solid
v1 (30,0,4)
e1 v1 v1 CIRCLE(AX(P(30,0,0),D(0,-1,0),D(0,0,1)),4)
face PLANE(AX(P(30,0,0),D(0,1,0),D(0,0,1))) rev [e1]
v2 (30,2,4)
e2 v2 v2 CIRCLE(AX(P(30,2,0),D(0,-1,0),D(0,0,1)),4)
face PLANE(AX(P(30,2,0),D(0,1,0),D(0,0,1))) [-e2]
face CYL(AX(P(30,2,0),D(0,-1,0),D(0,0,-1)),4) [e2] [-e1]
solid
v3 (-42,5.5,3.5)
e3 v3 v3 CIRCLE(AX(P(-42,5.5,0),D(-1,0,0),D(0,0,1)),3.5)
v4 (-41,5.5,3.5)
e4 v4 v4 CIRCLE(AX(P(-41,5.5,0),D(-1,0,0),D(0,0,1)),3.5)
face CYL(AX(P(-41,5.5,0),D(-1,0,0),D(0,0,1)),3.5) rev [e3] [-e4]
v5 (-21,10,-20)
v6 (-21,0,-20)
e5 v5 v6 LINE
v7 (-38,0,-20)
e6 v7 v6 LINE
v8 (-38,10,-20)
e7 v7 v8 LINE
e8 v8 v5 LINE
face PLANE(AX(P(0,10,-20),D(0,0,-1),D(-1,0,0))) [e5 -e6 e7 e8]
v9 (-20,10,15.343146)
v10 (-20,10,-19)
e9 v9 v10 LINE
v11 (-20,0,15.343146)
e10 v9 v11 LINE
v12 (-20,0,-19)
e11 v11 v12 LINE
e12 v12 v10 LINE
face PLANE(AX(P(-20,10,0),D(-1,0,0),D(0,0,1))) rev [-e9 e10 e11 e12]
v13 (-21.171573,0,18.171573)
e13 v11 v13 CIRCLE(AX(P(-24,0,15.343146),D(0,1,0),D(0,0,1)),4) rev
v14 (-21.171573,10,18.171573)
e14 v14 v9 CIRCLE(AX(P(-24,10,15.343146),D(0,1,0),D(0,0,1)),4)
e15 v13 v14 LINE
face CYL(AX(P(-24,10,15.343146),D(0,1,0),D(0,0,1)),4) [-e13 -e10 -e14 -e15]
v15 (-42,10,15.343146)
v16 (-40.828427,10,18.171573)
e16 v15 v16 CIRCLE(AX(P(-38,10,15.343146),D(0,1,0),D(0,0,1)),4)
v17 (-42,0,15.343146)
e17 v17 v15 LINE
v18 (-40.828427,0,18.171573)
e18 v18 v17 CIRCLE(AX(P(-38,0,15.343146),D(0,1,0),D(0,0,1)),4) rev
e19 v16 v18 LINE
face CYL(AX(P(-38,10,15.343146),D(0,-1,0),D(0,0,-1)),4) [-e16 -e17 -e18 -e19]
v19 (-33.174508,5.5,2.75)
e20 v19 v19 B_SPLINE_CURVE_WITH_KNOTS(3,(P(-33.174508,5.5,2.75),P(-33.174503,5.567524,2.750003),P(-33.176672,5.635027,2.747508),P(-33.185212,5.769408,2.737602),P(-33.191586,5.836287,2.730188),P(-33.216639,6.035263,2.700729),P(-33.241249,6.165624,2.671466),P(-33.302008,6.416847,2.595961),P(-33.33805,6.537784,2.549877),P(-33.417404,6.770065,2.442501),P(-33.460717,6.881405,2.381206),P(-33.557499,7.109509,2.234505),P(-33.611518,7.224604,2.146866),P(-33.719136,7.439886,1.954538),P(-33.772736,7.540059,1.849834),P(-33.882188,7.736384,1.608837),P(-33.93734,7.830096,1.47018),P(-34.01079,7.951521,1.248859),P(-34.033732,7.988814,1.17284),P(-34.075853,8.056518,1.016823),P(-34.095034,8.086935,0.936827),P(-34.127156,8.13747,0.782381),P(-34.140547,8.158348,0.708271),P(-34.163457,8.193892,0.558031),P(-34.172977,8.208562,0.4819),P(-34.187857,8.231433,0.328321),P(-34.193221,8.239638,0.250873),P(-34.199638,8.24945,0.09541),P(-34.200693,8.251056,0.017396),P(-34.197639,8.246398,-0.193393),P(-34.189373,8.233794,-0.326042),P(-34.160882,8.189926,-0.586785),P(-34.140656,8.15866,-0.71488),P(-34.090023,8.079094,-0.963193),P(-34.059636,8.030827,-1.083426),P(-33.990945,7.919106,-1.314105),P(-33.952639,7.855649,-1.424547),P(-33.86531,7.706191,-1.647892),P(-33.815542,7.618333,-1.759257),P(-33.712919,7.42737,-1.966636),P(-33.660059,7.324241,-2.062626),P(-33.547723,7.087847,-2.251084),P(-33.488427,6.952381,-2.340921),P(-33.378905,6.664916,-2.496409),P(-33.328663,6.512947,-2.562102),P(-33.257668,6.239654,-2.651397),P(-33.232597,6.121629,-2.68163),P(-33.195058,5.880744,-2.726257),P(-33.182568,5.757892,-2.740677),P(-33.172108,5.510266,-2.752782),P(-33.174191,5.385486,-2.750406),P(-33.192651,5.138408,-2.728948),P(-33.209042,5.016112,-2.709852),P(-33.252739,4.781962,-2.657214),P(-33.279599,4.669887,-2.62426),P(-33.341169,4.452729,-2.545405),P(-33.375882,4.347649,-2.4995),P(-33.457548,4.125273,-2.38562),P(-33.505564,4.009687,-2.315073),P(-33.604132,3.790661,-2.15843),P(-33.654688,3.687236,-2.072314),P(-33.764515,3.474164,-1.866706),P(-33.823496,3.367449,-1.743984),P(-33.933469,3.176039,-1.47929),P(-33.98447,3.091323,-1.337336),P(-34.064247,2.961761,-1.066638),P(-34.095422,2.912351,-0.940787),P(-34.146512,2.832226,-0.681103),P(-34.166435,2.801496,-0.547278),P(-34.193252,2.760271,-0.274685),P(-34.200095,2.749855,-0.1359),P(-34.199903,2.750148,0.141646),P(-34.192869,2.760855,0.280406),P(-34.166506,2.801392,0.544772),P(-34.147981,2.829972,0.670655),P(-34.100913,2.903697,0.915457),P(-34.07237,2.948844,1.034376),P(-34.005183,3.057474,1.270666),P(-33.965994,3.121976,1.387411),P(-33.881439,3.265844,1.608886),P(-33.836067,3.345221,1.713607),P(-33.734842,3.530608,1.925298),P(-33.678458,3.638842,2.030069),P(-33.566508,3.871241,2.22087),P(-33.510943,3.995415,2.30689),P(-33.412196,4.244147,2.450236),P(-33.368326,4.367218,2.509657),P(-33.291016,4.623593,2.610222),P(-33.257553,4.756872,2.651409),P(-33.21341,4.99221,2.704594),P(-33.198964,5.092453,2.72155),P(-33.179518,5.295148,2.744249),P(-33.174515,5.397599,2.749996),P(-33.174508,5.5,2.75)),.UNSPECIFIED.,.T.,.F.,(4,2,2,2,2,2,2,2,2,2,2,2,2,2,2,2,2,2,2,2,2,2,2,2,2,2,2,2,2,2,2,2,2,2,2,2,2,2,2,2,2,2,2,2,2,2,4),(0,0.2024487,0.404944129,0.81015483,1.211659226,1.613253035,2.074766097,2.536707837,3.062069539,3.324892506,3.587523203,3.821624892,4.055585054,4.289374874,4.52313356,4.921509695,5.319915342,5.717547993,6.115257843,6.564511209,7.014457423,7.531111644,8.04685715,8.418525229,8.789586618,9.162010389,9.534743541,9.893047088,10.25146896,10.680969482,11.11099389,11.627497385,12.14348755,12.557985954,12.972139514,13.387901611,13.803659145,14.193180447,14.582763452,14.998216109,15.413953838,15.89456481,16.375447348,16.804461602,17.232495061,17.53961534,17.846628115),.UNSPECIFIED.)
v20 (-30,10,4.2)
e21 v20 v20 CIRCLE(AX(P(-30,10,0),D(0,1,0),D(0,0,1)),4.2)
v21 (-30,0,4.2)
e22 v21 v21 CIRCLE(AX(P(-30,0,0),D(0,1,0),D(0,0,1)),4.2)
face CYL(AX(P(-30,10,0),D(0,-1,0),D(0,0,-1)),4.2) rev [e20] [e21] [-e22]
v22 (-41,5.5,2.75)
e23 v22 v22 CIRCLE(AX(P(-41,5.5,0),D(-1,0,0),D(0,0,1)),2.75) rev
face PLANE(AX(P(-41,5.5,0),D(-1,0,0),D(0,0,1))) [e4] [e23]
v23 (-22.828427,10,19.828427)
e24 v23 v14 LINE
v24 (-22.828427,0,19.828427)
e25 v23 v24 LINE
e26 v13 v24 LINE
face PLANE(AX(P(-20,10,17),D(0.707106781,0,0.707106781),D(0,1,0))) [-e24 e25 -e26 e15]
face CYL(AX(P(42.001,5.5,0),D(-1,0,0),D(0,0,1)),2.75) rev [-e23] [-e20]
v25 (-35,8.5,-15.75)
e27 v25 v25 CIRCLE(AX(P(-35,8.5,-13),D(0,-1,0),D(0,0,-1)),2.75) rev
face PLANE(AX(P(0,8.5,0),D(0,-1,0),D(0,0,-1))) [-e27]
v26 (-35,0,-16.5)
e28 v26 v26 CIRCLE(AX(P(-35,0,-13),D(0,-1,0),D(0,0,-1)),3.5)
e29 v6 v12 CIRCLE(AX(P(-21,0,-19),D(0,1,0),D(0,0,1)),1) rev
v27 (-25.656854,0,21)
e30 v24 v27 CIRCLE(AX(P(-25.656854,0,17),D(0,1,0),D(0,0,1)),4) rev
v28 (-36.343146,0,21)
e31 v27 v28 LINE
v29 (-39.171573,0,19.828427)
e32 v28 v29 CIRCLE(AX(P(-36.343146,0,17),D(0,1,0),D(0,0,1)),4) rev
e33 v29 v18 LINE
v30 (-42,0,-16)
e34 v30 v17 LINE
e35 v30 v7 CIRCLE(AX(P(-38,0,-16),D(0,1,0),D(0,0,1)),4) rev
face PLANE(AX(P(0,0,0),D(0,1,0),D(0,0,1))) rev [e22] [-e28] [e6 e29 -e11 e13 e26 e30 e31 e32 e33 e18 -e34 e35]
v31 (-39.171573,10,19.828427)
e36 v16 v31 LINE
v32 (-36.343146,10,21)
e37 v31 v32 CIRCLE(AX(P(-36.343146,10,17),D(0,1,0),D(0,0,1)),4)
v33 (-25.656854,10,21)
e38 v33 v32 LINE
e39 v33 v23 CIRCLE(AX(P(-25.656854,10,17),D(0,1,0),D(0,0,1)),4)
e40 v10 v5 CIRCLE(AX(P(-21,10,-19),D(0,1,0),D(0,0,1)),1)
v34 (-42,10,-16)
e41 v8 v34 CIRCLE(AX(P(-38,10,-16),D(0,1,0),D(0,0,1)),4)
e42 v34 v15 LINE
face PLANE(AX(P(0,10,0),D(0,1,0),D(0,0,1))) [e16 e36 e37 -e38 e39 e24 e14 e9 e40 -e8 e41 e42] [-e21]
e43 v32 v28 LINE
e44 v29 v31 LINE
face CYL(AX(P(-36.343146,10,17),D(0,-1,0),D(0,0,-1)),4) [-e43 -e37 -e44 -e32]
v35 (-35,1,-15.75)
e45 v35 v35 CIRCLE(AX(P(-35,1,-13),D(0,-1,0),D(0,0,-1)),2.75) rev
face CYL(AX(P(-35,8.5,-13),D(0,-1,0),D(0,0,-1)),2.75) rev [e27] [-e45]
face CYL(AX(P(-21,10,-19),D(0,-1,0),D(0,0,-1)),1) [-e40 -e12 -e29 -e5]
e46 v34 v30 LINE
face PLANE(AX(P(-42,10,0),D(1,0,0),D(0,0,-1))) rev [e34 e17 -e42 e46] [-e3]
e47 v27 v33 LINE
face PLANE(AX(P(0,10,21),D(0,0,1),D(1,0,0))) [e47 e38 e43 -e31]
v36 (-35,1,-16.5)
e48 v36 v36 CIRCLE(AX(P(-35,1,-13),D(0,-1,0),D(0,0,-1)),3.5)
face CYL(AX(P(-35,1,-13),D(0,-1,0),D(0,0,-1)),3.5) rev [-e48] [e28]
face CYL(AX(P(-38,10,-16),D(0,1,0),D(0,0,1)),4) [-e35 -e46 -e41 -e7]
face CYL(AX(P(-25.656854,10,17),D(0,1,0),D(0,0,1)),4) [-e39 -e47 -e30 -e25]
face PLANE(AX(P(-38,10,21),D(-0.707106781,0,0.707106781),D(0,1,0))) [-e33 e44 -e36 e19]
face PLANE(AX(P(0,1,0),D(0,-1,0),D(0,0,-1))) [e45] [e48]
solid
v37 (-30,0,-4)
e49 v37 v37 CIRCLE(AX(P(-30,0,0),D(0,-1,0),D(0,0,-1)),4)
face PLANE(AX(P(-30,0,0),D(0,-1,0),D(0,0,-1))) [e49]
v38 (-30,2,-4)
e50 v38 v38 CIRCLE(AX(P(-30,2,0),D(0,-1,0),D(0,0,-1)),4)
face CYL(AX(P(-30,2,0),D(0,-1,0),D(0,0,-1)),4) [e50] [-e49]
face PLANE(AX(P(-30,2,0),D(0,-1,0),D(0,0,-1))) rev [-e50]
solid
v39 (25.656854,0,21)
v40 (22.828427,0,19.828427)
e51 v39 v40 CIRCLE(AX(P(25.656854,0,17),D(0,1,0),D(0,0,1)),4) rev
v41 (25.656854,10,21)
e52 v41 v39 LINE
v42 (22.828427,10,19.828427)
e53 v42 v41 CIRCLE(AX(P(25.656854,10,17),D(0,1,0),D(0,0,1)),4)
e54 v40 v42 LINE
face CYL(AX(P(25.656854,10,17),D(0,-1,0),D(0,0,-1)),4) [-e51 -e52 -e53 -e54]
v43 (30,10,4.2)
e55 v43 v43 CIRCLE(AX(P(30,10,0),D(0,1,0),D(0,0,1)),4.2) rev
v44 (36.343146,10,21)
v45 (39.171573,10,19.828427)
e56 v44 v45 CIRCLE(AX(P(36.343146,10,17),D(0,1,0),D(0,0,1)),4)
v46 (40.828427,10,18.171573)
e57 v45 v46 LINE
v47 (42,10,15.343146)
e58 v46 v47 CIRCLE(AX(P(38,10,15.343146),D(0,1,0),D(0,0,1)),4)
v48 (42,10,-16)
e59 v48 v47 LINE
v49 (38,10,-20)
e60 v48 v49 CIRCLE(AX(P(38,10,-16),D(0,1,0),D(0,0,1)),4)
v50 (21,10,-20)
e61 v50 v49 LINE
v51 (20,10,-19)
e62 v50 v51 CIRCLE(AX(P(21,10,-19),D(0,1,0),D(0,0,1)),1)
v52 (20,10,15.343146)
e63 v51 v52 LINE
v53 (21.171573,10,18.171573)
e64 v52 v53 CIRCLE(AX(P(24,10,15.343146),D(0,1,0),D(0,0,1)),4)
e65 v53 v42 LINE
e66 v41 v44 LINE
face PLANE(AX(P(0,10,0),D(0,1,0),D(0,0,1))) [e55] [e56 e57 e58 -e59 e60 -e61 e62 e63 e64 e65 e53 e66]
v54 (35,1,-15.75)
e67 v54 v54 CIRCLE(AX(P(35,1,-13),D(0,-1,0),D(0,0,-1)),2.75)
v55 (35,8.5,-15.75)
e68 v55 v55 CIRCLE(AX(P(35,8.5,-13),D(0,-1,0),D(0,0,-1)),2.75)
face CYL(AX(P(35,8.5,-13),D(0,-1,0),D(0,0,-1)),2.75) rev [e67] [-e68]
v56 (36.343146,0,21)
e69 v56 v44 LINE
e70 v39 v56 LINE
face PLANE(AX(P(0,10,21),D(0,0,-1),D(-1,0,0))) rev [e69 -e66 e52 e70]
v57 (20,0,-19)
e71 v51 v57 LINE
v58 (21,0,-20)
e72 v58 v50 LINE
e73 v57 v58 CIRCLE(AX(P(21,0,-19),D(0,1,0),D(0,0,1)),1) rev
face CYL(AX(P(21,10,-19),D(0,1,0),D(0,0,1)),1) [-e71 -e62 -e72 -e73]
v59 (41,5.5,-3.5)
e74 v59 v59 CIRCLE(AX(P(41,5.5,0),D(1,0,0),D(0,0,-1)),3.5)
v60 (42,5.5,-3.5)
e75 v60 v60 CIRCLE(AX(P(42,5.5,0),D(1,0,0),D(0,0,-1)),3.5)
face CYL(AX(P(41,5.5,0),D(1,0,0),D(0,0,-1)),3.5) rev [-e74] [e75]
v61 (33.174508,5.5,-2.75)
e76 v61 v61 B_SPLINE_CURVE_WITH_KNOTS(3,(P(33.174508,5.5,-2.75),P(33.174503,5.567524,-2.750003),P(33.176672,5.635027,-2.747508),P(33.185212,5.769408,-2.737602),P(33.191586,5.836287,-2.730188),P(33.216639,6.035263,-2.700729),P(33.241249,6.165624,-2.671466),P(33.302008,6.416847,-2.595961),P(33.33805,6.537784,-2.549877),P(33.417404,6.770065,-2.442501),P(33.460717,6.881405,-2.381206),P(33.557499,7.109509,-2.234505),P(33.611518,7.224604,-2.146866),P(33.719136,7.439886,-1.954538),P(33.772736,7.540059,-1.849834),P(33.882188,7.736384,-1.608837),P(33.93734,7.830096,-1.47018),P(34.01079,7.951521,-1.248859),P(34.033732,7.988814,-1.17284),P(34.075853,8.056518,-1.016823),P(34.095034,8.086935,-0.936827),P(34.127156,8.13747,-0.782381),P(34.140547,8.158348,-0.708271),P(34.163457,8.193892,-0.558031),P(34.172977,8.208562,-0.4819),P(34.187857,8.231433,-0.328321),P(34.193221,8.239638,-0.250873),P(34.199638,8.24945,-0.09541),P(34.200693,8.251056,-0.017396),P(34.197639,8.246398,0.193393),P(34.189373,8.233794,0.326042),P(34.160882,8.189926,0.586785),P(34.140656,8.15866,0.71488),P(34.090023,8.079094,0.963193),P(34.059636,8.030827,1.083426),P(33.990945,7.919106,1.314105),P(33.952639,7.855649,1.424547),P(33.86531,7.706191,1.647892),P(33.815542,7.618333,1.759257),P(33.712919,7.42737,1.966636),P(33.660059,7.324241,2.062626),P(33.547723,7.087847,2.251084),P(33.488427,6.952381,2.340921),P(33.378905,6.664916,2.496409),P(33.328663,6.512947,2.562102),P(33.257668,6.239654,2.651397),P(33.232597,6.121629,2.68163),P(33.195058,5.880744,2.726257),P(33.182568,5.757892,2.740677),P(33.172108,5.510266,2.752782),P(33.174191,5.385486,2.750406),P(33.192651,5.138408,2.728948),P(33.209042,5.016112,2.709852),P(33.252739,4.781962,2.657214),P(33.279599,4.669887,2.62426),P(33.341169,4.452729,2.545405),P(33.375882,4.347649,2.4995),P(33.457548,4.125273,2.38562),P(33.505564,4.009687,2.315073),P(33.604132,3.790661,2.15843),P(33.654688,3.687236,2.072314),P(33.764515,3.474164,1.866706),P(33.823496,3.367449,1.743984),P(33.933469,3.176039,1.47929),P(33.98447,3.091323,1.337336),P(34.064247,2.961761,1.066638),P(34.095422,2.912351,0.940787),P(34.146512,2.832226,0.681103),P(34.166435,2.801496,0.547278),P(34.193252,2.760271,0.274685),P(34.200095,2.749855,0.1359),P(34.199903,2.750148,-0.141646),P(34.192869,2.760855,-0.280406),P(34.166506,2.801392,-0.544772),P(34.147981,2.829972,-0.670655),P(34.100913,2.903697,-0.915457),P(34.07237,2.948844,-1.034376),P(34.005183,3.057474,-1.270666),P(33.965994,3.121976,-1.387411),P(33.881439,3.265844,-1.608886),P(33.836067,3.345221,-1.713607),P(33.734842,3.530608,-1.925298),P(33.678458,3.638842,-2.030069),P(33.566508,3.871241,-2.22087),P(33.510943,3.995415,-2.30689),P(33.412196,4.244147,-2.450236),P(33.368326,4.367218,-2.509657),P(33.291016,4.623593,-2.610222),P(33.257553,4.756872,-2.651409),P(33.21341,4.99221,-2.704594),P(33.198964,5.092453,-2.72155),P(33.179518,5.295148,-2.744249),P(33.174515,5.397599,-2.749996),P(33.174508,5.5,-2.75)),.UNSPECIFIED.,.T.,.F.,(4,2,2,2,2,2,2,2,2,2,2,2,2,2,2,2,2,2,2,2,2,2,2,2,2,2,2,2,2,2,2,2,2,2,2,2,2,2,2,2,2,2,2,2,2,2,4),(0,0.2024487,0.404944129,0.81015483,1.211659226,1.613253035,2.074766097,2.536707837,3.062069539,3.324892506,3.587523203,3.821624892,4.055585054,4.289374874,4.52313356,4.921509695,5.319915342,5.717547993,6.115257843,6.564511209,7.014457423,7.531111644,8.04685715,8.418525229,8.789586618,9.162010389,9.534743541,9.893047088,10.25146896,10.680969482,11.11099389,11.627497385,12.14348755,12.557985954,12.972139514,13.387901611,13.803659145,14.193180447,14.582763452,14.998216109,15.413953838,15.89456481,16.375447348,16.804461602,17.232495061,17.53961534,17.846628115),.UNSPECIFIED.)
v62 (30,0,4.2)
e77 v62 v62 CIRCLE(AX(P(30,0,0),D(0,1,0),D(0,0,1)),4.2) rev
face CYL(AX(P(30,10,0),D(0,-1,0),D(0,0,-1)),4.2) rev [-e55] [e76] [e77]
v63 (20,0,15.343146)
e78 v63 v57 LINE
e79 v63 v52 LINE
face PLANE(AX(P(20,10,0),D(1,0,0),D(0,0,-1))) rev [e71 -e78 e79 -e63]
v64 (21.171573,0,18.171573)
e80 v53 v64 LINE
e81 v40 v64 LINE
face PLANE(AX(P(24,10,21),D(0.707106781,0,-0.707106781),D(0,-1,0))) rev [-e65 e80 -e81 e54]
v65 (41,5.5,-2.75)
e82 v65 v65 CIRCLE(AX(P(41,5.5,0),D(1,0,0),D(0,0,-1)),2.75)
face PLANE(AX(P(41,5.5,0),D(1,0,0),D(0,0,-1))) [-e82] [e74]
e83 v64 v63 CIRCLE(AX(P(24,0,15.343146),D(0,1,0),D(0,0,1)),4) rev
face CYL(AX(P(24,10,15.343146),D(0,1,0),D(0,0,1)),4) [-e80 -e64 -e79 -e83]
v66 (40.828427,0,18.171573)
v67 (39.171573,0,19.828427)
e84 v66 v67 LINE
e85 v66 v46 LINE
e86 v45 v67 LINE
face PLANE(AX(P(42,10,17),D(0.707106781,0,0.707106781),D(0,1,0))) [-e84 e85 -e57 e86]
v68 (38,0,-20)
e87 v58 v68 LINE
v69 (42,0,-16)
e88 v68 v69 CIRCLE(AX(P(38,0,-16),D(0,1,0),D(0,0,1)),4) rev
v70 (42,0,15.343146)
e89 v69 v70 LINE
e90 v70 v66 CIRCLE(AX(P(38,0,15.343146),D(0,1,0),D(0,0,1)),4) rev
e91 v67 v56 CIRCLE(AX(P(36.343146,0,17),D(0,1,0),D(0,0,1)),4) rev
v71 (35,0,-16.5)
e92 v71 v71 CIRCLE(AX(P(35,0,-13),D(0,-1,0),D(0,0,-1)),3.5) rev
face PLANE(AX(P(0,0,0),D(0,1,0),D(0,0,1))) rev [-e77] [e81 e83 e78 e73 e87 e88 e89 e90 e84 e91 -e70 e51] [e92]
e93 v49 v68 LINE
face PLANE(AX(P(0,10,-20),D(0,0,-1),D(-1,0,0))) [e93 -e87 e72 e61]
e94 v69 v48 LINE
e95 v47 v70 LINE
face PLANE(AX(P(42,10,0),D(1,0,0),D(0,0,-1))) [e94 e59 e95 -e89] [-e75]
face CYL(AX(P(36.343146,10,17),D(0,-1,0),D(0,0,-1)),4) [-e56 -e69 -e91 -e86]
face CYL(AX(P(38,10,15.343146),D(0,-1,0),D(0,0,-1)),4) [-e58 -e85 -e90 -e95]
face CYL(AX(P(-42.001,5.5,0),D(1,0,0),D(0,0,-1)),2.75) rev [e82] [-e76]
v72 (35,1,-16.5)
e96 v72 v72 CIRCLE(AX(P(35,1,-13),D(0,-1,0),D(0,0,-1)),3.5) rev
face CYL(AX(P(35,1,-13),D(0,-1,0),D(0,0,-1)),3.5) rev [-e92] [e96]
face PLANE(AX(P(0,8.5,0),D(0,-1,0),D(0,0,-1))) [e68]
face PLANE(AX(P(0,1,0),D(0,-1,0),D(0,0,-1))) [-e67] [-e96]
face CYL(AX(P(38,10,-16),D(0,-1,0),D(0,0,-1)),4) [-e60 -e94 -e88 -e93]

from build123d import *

# Parameters (mm, degrees)
ESQUISSE1_R                 = 4.2
BOSS_EXTRU_1_DEPTH          = 10
CHANFREIN3_SIZE             = 4
CONG_2_R                    = 4
ESQUISSE3_R                 = 4
BOSS_EXTRU_2_DEPTH          = 2
BOSS_EXTRU_2_2_DEPTH        = 2
ENL_V_START                 = -42
ENL_V_MAT_EXTRU_4_OUTLINE_R = 2.75
ENL_V_MAT_EXTRU_4_DEPTH     = 8.825492271
CONG_4_R                    = 4
ESQUISSE7_R                 = 2.75
ENL_V_MAT_EXTRU_5_DEPTH     = 8.5
ESQUISSE7_4_R               = 3.5
ESQUISSE7_4_R_2             = 2.75
ENL_V_MAT_EXTRU_8_DEPTH     = 1
ESQUISSE8_R                 = 3.5
ENL_V_MAT_EXTRU_9_DEPTH     = 1
ENL_V_START_2               = -1
ESQUISSE9_R                 = 3.5
ENL_V_MAT_EXTRU_10_DEPTH    = 1
ESQUISSE10_W                = 40
ESQUISSE10_H                = 50.736146746
ENL_V_MAT_EXTRU_11_DEPTH    = 10
CONG_5_R                    = 1
CONG_6_R                    = 1


# Read off the part's stored shape, not the designer's step: Enlèv. mat.-Extru.4
with BuildPart() as part:
    # Esquisse1 → Boss.-Extru.1 (new body)
    # profile 1 of 4: a face of its own
    with BuildSketch(Plane(origin=(0, 0, 0), x_dir=(1, 0, 0), z_dir=(0, 1, 0))):
        Polygon((-20, 6.5), (-20, 12), (-20, 13.5), (-15, 13.5), (0, 13.5), (0, 20), (-42, 20), (-42, 12), (-42, 0), (-42, -21), (-20, -21), align=None)
        with Locations(Location((-30, 0, 0), (0, 0, 270))):
            Circle(ESQUISSE1_R, mode=Mode.SUBTRACT)
    # profile 2 of 4: a face of its own
    with BuildSketch(Plane(origin=(0, 0, 0), x_dir=(1, 0, 0), z_dir=(0, 1, 0))):
        Polygon((0, 20), (0, 13.5), (15, 13.5), (20, 13.5), (20, 12), (20, 6.5), (20, -21), (42, -21), (42, 0), (42, 12), (42, 20), align=None)
        with Locations(Location((30, 0, 0), (0, 0, 270))):
            Circle(ESQUISSE1_R, mode=Mode.SUBTRACT)
    # profile 3 of 4: a face of its own
    with BuildSketch(Plane(origin=(0, 0, 0), x_dir=(1, 0, 0), z_dir=(0, 1, 0))):
        Polygon((-20, 13.5), (-20, 12), (-20, 6.5), (-15, 13.5), align=None)
    # profile 4 of 4: a face of its own
    with BuildSketch(Plane(origin=(0, 0, 0), x_dir=(1, 0, 0), z_dir=(0, 1, 0))):
        Polygon((20, 13.5), (15, 13.5), (20, 6.5), (20, 12), align=None)
    extrude(amount=BOSS_EXTRU_1_DEPTH)

    # Chanfrein3
    chanfrein3_edges = [part.edges().sort_by_distance(p)[0] for p in [
        (-20, 5, 21),
        (-42, 5, 21),
        (42, 5, 21),
        (20, 5, 21),
    ]]
    chamfer(chanfrein3_edges, length=CHANFREIN3_SIZE)

    # Congé2
    cong_2_edges = [part.edges().sort_by_distance(p)[0] for p in [
        (42, 5, 17),
        (24, 5, 21),
        (38, 5, 21),
        (20, 5, 17),
        (-24, 5, 21),
        (-38, 5, 21),
        (-42, 5, 17),
        (-20, 5, 17),
    ]]
    fillet(cong_2_edges, radius=CONG_2_R)

    # Enlèv. mat.-Extru.4 outline → Enlèv. mat.-Extru.4 (cut)
    with BuildSketch(Plane.YZ.offset(ENL_V_START)):
        with Locations((5.5, 0)):
            Circle(ENL_V_MAT_EXTRU_4_OUTLINE_R)
    enl_v_mat_extru_4 = extrude(amount=ENL_V_MAT_EXTRU_4_DEPTH, mode=Mode.SUBTRACT)

    # Symétrie10: Enlèv. mat.-Extru.4 across plane
    add(enl_v_mat_extru_4.mirror(Plane(origin=(0, 0, 0), x_dir=(0, 0, 1), z_dir=(1, 0, 0))), mode=Mode.SUBTRACT)

    # Congé4
    cong_4_edges = [part.edges().sort_by_distance(p)[0] for p in [
        (-42, 5, -20),
        (42, 5, -20),
        (20, 5, -6.5),
        (15, 5, -13.5),
        (-15, 5, -13.5),
        (-20, 5, -6.5),
    ]]
    fillet(cong_4_edges, radius=CONG_4_R)

    # Esquisse7 → Enlèv. mat.-Extru.5 (cut)
    with BuildSketch(Plane.XZ):
        with Locations(Location((-35, -13, 0), (0, 0, 270))):
            Circle(ESQUISSE7_R)
        with Locations(Location((35, -13, 0), (0, 0, 270))):
            Circle(ESQUISSE7_R)
    extrude(amount=-ENL_V_MAT_EXTRU_5_DEPTH, mode=Mode.SUBTRACT)

    # Esquisse7<4> → Enlèv. mat.-Extru.8 (cut)
    # profile 1 of 2: a face of its own
    with BuildSketch(Plane.XZ):
        with Locations(Location((-35, -13, 0), (0, 0, 270))):
            Circle(ESQUISSE7_4_R)
        with Locations(Location((-35, -13, 0), (0, 0, 270))):
            Circle(ESQUISSE7_4_R_2, mode=Mode.SUBTRACT)
    # profile 2 of 2: a face of its own
    with BuildSketch(Plane.XZ):
        with Locations(Location((35, -13, 0), (0, 0, 270))):
            Circle(ESQUISSE7_4_R)
        with Locations(Location((35, -13, 0), (0, 0, 270))):
            Circle(ESQUISSE7_4_R_2, mode=Mode.SUBTRACT)
    extrude(amount=-ENL_V_MAT_EXTRU_8_DEPTH, mode=Mode.SUBTRACT)

    # Esquisse8 → Enlèv. mat.-Extru.9 (cut)
    with BuildSketch(Plane.ZY.offset(42)):
        with Locations((0, 5.5)):
            Circle(ESQUISSE8_R)
    extrude(amount=-ENL_V_MAT_EXTRU_9_DEPTH, mode=Mode.SUBTRACT)

    # Esquisse9 → Enlèv. mat.-Extru.10 (cut)
    with BuildSketch(Plane(origin=(42, 0, 0), x_dir=(0, 0, -1), z_dir=(1, 0, 0)).offset(ENL_V_START_2)):
        with Locations(Location((0, 5.5, 0), (0, 0, 180))):
            Circle(ESQUISSE9_R)
    extrude(amount=ENL_V_MAT_EXTRU_10_DEPTH, mode=Mode.SUBTRACT)

    # Esquisse10 → Enlèv. mat.-Extru.11 (cut)
    with BuildSketch(Plane(origin=(0, 10, 0), x_dir=(1, 0, 0), z_dir=(0, 1, 0))):
        Rectangle(ESQUISSE10_W, ESQUISSE10_H)
    extrude(amount=-ENL_V_MAT_EXTRU_11_DEPTH, mode=Mode.SUBTRACT)


with BuildPart() as body_2:
    # Esquisse3 → Boss.-Extru.2 (new body)
    with BuildSketch(Plane.XZ):
        with Locations(Location((-30, 0, 0), (0, 0, 270))):
            Circle(ESQUISSE3_R)
    extrude(amount=-BOSS_EXTRU_2_DEPTH)


with BuildPart() as body_3:
    # Esquisse3 → Boss.-Extru.2 2 (new body)
    with BuildSketch(Plane.XZ):
        with Locations(Location((30, 0, 0), (0, 0, 90))):
            Circle(ESQUISSE3_R)
    extrude(amount=-BOSS_EXTRU_2_2_DEPTH)


with BuildPart() as enl_v_mat_extru_11_piece_1:
    # of the separate pieces the step leaves, piece 1, a body of its own (enl_v_mat_extru_11_pieces)
    add(part.part.solids().sort_by_distance((-42, 0, -16))[0])

    # Congé5
    cong_5_edges = [enl_v_mat_extru_11_piece_1.edges().sort_by_distance(p)[0] for p in [
        (-20, 5, -20),
    ]]
    fillet(cong_5_edges, radius=CONG_5_R)


with BuildPart() as enl_v_mat_extru_11_piece_2:
    # of the separate pieces the step leaves, piece 2, a body of its own (enl_v_mat_extru_11_pieces)
    add(part.part.solids().sort_by_distance((20, 0, -20))[0])

    # Congé6
    cong_6_edges = [enl_v_mat_extru_11_piece_2.edges().sort_by_distance(p)[0] for p in [
        (20, 5, -20),
    ]]
    fillet(cong_6_edges, radius=CONG_6_R)


solid = Compound([body_2.part, body_3.part, enl_v_mat_extru_11_piece_1.part, enl_v_mat_extru_11_piece_2.part])
